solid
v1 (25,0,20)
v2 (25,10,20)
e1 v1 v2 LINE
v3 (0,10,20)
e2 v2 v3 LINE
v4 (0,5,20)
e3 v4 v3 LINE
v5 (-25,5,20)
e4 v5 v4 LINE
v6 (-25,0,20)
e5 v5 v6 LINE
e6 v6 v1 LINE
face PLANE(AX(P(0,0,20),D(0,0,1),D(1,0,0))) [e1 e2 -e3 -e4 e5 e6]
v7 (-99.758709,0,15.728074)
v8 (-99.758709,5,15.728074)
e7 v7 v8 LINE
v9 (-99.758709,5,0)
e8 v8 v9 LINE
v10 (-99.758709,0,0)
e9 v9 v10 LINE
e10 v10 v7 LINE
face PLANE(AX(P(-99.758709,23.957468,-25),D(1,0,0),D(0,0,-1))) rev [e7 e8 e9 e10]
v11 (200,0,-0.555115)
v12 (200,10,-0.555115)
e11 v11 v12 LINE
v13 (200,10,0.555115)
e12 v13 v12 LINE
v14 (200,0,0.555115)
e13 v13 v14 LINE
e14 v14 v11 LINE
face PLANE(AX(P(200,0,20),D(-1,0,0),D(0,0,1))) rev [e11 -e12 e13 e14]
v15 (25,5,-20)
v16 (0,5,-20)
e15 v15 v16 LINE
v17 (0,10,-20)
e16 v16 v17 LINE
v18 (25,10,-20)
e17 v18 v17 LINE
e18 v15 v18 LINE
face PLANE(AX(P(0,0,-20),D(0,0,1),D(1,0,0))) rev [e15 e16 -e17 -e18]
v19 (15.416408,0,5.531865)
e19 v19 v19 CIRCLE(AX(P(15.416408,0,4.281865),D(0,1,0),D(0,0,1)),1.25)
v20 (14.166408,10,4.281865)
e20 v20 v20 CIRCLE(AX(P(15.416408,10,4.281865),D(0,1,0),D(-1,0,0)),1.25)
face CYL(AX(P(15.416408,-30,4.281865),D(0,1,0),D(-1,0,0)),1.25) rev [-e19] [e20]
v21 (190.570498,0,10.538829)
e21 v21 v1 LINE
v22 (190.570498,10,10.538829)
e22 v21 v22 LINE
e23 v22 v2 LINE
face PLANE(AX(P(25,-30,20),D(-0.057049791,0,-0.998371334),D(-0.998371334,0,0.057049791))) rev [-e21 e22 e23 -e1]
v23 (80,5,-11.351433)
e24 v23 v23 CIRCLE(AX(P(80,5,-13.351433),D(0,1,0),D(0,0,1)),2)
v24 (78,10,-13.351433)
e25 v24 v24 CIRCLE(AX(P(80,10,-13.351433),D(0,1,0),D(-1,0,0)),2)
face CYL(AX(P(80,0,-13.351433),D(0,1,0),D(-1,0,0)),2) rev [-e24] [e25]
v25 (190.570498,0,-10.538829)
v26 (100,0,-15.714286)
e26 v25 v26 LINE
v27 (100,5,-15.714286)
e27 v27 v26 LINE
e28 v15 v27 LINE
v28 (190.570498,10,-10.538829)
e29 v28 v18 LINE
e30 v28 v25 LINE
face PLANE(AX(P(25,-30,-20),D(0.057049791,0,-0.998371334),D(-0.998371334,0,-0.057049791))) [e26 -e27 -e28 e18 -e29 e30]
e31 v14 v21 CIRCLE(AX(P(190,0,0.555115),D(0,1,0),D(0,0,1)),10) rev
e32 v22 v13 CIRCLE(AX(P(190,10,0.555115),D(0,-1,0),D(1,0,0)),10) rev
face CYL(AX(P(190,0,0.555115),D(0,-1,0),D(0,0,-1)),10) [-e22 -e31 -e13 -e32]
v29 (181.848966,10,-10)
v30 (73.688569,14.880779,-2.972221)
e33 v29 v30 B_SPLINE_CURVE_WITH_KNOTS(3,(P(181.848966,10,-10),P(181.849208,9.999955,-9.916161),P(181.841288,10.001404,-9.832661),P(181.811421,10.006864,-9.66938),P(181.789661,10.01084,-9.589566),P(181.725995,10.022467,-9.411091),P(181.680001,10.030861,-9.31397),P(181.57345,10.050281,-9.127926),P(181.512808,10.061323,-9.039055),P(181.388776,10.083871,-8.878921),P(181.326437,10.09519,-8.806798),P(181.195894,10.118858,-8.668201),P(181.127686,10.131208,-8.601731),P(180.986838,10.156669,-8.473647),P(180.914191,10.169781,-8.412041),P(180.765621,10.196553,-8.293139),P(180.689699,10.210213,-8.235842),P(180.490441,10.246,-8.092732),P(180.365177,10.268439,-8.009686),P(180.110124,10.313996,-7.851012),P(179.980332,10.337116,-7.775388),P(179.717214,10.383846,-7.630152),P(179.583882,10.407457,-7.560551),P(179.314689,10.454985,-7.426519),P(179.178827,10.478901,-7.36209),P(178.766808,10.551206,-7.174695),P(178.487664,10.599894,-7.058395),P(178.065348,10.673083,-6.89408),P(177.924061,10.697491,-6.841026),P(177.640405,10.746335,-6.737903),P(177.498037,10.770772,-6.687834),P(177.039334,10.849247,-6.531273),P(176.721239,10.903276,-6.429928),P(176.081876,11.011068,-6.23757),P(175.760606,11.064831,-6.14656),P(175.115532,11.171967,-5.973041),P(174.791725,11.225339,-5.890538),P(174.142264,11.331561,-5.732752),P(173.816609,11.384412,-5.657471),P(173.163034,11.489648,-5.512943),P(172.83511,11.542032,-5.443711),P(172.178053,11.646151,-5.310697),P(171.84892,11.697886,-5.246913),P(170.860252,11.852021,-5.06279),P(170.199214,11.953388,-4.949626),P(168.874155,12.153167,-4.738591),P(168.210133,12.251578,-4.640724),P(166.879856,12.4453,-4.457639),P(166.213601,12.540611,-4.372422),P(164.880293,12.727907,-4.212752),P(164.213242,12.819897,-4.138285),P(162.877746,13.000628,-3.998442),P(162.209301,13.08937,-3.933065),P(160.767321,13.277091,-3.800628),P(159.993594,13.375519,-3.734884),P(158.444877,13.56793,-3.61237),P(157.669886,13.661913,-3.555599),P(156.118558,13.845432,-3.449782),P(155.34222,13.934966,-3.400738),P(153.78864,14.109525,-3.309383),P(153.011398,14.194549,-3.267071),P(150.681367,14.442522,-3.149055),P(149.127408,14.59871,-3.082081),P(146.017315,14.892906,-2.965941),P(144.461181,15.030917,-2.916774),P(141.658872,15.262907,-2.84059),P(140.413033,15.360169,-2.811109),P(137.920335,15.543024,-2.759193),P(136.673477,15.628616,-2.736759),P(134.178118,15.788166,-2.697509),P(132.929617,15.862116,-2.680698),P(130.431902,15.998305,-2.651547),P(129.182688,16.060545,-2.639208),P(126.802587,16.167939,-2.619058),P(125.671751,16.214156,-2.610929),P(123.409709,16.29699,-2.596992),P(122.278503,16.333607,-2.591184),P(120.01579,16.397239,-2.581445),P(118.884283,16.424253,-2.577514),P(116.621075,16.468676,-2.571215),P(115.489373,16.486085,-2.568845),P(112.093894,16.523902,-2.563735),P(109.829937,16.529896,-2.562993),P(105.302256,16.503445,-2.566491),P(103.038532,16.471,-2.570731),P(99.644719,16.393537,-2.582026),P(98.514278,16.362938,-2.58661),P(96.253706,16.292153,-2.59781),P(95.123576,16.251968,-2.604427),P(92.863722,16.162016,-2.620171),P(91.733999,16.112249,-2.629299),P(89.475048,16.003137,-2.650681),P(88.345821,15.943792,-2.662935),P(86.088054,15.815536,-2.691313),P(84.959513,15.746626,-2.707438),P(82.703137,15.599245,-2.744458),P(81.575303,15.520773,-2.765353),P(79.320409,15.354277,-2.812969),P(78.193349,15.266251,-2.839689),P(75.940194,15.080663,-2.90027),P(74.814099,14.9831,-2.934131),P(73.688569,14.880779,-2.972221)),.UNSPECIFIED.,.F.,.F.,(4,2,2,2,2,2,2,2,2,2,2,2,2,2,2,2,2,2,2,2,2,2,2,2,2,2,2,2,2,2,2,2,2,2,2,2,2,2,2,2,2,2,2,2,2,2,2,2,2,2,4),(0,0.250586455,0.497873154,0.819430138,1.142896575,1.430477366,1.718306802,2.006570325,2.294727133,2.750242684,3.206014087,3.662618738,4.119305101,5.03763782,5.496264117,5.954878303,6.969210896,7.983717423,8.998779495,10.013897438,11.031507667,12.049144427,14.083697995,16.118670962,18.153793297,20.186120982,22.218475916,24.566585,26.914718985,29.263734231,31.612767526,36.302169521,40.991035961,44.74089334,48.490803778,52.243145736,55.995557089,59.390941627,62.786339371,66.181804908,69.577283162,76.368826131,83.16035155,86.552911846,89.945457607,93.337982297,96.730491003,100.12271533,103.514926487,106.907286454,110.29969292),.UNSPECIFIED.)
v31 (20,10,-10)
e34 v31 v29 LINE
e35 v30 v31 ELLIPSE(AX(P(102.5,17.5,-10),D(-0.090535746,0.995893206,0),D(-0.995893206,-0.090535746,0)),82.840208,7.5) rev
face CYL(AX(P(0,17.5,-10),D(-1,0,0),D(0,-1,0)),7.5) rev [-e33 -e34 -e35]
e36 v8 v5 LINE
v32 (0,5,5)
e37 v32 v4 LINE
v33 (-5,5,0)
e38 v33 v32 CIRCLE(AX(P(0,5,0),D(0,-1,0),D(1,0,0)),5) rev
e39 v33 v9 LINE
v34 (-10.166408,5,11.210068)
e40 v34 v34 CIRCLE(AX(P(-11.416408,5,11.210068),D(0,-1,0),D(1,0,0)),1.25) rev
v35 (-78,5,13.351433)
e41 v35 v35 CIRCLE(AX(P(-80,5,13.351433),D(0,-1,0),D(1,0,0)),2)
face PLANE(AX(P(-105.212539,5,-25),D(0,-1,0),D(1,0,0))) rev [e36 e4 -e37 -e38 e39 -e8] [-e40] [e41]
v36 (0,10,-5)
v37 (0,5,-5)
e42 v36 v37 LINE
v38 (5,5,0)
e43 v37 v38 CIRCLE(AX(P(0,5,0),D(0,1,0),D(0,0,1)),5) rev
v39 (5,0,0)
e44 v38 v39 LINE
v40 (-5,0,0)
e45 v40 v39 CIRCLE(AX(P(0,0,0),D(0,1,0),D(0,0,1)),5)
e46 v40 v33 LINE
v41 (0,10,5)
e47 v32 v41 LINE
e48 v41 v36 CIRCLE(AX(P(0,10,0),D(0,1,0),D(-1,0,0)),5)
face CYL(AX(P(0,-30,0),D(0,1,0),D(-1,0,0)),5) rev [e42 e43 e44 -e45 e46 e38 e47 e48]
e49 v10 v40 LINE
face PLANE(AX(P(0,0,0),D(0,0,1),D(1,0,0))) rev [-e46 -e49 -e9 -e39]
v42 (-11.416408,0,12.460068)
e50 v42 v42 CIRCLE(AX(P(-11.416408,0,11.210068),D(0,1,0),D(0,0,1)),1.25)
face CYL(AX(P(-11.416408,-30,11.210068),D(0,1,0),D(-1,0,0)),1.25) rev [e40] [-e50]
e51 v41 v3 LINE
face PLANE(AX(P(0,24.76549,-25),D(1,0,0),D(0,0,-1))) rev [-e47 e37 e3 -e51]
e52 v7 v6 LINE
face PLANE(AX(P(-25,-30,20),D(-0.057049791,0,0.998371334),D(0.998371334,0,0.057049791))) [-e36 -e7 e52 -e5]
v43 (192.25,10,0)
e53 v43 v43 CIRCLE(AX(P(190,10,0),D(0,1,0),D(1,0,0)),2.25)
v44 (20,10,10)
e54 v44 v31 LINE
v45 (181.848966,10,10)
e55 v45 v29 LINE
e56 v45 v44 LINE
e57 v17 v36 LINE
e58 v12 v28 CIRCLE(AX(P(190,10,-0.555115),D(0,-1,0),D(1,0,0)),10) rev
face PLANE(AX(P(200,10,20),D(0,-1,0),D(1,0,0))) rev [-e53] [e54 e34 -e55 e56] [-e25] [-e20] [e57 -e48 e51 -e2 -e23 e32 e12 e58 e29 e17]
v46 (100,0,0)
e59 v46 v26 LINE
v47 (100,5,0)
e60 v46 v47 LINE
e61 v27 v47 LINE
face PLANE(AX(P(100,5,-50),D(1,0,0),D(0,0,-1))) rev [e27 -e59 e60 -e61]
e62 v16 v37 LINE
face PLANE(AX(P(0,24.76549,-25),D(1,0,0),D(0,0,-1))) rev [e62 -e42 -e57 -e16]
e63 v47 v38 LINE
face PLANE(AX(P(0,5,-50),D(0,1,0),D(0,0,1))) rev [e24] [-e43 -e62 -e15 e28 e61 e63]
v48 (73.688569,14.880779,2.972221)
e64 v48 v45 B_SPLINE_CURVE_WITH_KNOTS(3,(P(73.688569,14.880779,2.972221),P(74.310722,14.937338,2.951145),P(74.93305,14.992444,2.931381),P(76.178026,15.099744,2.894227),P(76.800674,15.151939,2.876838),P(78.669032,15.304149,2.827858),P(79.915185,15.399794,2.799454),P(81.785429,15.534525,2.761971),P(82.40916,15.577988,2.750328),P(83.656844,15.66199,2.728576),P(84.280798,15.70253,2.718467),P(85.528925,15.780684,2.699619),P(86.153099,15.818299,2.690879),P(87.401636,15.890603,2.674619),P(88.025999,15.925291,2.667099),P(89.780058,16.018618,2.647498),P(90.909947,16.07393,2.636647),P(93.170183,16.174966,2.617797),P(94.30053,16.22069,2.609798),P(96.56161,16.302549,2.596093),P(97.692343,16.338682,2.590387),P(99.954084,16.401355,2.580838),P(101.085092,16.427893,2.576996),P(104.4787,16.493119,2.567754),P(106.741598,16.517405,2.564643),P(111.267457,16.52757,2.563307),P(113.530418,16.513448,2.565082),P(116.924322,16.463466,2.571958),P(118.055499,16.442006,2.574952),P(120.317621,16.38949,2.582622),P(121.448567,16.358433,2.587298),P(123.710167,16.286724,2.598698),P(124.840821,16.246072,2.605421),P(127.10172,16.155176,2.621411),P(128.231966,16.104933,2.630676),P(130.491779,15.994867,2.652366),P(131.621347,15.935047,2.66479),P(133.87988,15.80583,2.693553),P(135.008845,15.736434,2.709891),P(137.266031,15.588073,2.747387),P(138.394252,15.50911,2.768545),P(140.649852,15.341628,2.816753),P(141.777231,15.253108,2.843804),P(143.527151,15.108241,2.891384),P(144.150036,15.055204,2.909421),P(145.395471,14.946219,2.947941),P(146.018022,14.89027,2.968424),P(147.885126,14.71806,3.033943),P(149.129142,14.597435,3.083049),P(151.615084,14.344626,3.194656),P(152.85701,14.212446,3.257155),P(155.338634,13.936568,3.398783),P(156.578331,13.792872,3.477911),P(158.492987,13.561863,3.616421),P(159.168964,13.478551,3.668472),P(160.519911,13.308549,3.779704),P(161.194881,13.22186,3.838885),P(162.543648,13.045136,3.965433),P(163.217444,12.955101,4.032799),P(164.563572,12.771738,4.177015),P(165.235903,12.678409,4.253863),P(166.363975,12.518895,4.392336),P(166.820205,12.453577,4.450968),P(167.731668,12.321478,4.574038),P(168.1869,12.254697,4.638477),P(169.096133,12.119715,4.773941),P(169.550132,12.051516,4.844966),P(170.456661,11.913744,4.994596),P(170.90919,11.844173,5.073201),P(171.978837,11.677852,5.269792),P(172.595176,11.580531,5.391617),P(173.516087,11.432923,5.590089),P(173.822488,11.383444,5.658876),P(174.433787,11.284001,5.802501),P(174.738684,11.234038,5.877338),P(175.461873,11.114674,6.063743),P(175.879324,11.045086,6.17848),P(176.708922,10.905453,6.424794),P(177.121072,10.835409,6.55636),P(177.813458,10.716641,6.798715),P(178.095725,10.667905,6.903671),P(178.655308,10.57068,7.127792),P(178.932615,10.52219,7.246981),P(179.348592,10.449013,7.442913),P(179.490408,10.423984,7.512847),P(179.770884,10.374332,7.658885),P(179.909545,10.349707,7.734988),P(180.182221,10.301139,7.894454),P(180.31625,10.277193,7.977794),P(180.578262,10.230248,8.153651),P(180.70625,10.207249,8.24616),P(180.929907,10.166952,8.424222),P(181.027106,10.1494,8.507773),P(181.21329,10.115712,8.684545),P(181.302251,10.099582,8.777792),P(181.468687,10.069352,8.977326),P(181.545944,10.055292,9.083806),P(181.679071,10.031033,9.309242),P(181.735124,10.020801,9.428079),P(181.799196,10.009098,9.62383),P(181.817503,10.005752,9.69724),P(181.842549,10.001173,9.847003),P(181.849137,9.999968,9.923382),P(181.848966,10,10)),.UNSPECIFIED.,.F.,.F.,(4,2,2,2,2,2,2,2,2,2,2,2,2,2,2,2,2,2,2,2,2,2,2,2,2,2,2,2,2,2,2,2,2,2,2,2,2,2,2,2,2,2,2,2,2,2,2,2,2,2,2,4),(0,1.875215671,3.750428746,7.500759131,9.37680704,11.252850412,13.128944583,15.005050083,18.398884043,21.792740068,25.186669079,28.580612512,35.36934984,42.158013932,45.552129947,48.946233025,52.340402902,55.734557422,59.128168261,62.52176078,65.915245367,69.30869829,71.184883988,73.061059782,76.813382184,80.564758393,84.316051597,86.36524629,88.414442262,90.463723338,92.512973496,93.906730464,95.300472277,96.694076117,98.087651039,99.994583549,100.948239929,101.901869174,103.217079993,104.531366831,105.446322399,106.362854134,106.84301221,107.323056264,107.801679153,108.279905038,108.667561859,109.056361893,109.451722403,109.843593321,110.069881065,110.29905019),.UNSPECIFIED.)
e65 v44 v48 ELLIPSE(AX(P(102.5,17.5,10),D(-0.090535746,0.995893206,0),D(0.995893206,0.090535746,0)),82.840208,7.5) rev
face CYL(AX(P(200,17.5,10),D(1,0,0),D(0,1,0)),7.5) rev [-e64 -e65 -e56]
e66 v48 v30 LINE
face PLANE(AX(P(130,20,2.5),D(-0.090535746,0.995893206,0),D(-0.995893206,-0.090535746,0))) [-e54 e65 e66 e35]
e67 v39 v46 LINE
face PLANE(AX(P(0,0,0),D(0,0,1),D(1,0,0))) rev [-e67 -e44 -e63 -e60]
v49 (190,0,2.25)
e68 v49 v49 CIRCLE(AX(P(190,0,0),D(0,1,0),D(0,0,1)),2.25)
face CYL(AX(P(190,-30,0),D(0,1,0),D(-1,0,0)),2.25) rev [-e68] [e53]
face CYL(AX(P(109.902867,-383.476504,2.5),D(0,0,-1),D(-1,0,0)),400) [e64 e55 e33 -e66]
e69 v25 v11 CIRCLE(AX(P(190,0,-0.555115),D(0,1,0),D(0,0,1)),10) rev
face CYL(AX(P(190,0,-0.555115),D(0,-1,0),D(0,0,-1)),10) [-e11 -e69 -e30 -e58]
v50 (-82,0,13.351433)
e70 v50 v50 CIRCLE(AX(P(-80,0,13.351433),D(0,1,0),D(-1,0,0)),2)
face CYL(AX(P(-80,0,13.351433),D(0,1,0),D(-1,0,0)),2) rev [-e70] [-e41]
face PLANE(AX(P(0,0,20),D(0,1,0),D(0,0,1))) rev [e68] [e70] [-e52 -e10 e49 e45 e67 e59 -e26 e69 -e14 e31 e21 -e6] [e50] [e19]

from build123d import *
from build123d.topology import SkipClean

# Parameters (mm, degrees)
BOSS_EXTRUDE1_DEPTH  = 20
SKETCH3_R            = 1.25
SKETCH3_R_2          = 5
SKETCH3_R_3          = 2.25
CUT_EXTRUDE1_DEPTH   = 40
CUT_EXTRUDE2_DEPTH   = 40
MIRROR2_COPY_1_DEPTH = 40
BOSS_EXTRUDE3_DEPTH  = 2.5
SKETCH6_W            = 103.671116399
SKETCH6_H            = 23.957467505
CUT_EXTRUDE3_DEPTH   = 25
SKETCH7_W            = 105.212539013
SKETCH7_H            = 19.765490072
CUT_EXTRUDE4_DEPTH   = 25
SKETCH8_W            = 102.846794358
SKETCH8_H            = 18.402184695
CUT_EXTRUDE5_DEPTH   = 50
SKETCH9_W            = 100
SKETCH9_H            = 9.37939479
CUT_EXTRUDE6_DEPTH   = 50
FILLET2_R            = 10
FILLET3_R            = 400
FILLET4_START        = -2.563828285
FILLET4_DEPTH        = 5.127667015
FILLET4_START_2      = -10.0000001
FILLET4_2_DEPTH      = 20.0000001
FILLET4_START_3      = 19.9999999
FILLET4_3_DEPTH      = 163.0000001
SKETCH10_R           = 2
CUT_EXTRUDE7_DEPTH   = 10


with BuildPart() as part:
    # Sketch2 → Boss-Extrude1 (new, symmetric)
    with BuildSketch(Plane.XY):
        Polygon((0, 0), (200, 0), (200, 10), (-200, 10), (-200, 0), align=None)
    extrude(amount=BOSS_EXTRUDE1_DEPTH, both=True)

    # Sketch3 → Cut-Extrude1 (cut)
    with BuildSketch(Plane(origin=(0, 10, 0), x_dir=(1, 0, 0), z_dir=(0, 1, 0))):
        with Locations(Location((-4, 15.491933385, 0), (0, 0, 180))):
            Circle(SKETCH3_R)
        with Locations(Location((15.416407865, -4.281865077, 0), (0, 0, 180))):
            Circle(SKETCH3_R)
        with Locations(Location((-11.416407865, -11.210068308, 0), (0, 0, 180))):
            Circle(SKETCH3_R)
        with Locations(Location((0, 0, 0), (0, 0, 180))):
            Circle(SKETCH3_R_2)
        with Locations(Location((-190, 0, 0), (0, 0, 180))):
            Circle(SKETCH3_R_3)
        with Locations(Location((190, 0, 0), (0, 0, 270))):
            Circle(SKETCH3_R_3)
    extrude(amount=-CUT_EXTRUDE1_DEPTH, mode=Mode.SUBTRACT)

    # Sketch4 → Cut-Extrude2 (cut)
    with BuildSketch(Plane(origin=(0, 10, 0), x_dir=(1, 0, 0), z_dir=(0, 1, 0))):
        Polygon((-205.682411406, 30.266574236), (-25, 30.266574236), (-25, 20), (-200, 10), (-205.682411406, 10), align=None)
    cut_extrude2 = extrude(amount=-CUT_EXTRUDE2_DEPTH, mode=Mode.SUBTRACT)

    # Mirror1: Cut-Extrude2 across plane
    add(cut_extrude2.mirror(Plane(origin=(0, 0, 0), x_dir=(0, 0, 1), z_dir=(1, 0, 0))), mode=Mode.SUBTRACT)

    # Mirror2: Cut-Extrude2 across plane
    add(cut_extrude2.mirror(Plane.XY), mode=Mode.SUBTRACT)

    # Mirror2 copy 1 sketch → Mirror2 copy 1 (cut)
    with BuildSketch(Plane(origin=(0, 10, 0), x_dir=(-1, 0, 0), z_dir=(0, 1, 0))):
        Polygon((-205.682411406, 30.266574236), (-25, 30.266574236), (-25, 20), (-200, 10), (-205.682411406, 10), align=None)
    extrude(amount=-MIRROR2_COPY_1_DEPTH, mode=Mode.SUBTRACT)

    # Sketch5 → Boss-Extrude3 (add, symmetric)
    with BuildSketch(Plane.XY):
        Polygon((-181.848966048, 10), (-20, 10), (-130, 20), align=None)
    boss_extrude3 = extrude(amount=BOSS_EXTRUDE3_DEPTH, both=True)

    # Mirror3: Boss-Extrude3 across plane
    add(boss_extrude3.mirror(Plane(origin=(0, 0, 0), x_dir=(0, 0, 1), z_dir=(1, 0, 0))))

    # Sketch6 → Cut-Extrude3 (cut, symmetric)
    with BuildSketch(Plane.XY):
        with Locations((-151.594267329, 11.978733753)):
            Rectangle(SKETCH6_W, SKETCH6_H)
    extrude(amount=CUT_EXTRUDE3_DEPTH, both=True, mode=Mode.SUBTRACT)

    # Sketch7 → Cut-Extrude4 (cut, symmetric)
    with BuildSketch(Plane.XY):
        with Locations((-52.606269507, 14.882745036)):
            Rectangle(SKETCH7_W, SKETCH7_H)
    extrude(amount=CUT_EXTRUDE4_DEPTH, both=True, mode=Mode.SUBTRACT)

    # Sketch8 → Cut-Extrude5 (cut)
    with BuildSketch(Plane.XY):
        with Locations((-51.423397179, -0.639817385)):
            Rectangle(SKETCH8_W, SKETCH8_H)
    extrude(amount=-CUT_EXTRUDE5_DEPTH, mode=Mode.SUBTRACT)

    # Sketch9 → Cut-Extrude6 (cut)
    with BuildSketch(Plane.XY):
        with Locations((50, 0.310302605)):
            Rectangle(SKETCH9_W, SKETCH9_H)
    extrude(amount=-CUT_EXTRUDE6_DEPTH, mode=Mode.SUBTRACT)

    # Fillet2
    fillet2_edges = [part.edges().sort_by_distance(p)[0] for p in [
        (200, 5, -10),
        (200, 5, 10),
    ]]
    fillet(fillet2_edges, radius=FILLET2_R)

    # Fillet3
    # the kernel refuses this fillet: 400 mm, written as the material it takes off along each edge
    with BuildSketch(Plane(origin=(130, 20, 143.859110373), x_dir=(0.9819042977432754, -0.1893777972025378, 0), z_dir=(0, 0, -1))) as fillet3_piece_1:
        with BuildLine():
            CenterArc((56.676030542, 399.981263631), FILLET3_R, 253.889095702, 15.55633982)
            Line((-54.322969389, 15.690719883), (-56.542949388, 8.004909008))
            Line((-56.542949388, 8.004909008), (-2.219979999, -7.685810875))
            Line((-2.219979999, -7.685810875), (0, -8))
            ThreePointArc((0, -8), (26.402250284, -8), (52.727069969, -7.999625273))
            Line((52.727069969, -7.999625273), (52.804500568, 0))
        make_face()
    extrude(amount=287.718220747, mode=Mode.SUBTRACT)

    # Fillet4: read off the stored shape, not the designer's step
    # Fillet4 outline → Fillet4 (add)
    with SkipClean():  # the faces are left unmerged after this step: merging them gives an invalid solid
        with BuildSketch(Plane.XY.offset(FILLET4_START)):
            with BuildLine():
                ThreePointArc((181.84896605, 10), (127.934669494, 16.116857351), (73.688568923, 14.880778993))
                Line((73.688568923, 14.880778993), (20, 10))
                Line((20, 10), (181.84896605, 10))
            make_face()
        extrude(amount=FILLET4_DEPTH)

    # Fillet4 2 outline → Fillet4 2 (add)
    with BuildSketch(Plane.XY.offset(FILLET4_START_2)):
        with BuildLine():
            ThreePointArc((181.84896605, 10), (127.934669494, 16.116857351), (73.688568923, 14.880778993))
            Line((73.688568923, 14.880778993), (20, 10))
            Line((20, 10), (181.84896605, 10))
        make_face()
    extrude(amount=FILLET4_2_DEPTH)

    # Fillet4 3 outline → Fillet4 3 (cut)
    with BuildSketch(Plane.YZ.offset(FILLET4_START_3)):
        with BuildLine():
            ThreePointArc((16.523566776, -2.5638331), (11.862037195, -5.053953558), (10, -10))
            Line((10, -10), (18, -10.0000001))
            Line((18, -10.0000001), (18, -2.369964609))
            Line((18, -2.369964609), (16.523566776, -2.5638331))
        make_face()
        with BuildLine():
            Line((16.523565368, 2.563833285), (18, 2.369964325))
            Line((18, 2.369964325), (18, 10))
            Line((18, 10), (10, 10))
            ThreePointArc((10, 10), (11.862036727, 5.053954091), (16.523565368, 2.563833285))
        make_face()
    extrude(amount=FILLET4_3_DEPTH, mode=Mode.SUBTRACT)

    # Sketch10 → Cut-Extrude7 (cut)
    with BuildSketch(Plane(origin=(0, 10, 0), x_dir=(1, 0, 0), z_dir=(0, 1, 0))):
        with Locations(Location((80, 13.351433229, 0), (0, 0, 180))):
            Circle(SKETCH10_R)
        with Locations(Location((-80, -13.351433229, 0), (0, 0, 180))):
            Circle(SKETCH10_R)
    extrude(amount=-CUT_EXTRUDE7_DEPTH, mode=Mode.SUBTRACT)


solid = part.part
